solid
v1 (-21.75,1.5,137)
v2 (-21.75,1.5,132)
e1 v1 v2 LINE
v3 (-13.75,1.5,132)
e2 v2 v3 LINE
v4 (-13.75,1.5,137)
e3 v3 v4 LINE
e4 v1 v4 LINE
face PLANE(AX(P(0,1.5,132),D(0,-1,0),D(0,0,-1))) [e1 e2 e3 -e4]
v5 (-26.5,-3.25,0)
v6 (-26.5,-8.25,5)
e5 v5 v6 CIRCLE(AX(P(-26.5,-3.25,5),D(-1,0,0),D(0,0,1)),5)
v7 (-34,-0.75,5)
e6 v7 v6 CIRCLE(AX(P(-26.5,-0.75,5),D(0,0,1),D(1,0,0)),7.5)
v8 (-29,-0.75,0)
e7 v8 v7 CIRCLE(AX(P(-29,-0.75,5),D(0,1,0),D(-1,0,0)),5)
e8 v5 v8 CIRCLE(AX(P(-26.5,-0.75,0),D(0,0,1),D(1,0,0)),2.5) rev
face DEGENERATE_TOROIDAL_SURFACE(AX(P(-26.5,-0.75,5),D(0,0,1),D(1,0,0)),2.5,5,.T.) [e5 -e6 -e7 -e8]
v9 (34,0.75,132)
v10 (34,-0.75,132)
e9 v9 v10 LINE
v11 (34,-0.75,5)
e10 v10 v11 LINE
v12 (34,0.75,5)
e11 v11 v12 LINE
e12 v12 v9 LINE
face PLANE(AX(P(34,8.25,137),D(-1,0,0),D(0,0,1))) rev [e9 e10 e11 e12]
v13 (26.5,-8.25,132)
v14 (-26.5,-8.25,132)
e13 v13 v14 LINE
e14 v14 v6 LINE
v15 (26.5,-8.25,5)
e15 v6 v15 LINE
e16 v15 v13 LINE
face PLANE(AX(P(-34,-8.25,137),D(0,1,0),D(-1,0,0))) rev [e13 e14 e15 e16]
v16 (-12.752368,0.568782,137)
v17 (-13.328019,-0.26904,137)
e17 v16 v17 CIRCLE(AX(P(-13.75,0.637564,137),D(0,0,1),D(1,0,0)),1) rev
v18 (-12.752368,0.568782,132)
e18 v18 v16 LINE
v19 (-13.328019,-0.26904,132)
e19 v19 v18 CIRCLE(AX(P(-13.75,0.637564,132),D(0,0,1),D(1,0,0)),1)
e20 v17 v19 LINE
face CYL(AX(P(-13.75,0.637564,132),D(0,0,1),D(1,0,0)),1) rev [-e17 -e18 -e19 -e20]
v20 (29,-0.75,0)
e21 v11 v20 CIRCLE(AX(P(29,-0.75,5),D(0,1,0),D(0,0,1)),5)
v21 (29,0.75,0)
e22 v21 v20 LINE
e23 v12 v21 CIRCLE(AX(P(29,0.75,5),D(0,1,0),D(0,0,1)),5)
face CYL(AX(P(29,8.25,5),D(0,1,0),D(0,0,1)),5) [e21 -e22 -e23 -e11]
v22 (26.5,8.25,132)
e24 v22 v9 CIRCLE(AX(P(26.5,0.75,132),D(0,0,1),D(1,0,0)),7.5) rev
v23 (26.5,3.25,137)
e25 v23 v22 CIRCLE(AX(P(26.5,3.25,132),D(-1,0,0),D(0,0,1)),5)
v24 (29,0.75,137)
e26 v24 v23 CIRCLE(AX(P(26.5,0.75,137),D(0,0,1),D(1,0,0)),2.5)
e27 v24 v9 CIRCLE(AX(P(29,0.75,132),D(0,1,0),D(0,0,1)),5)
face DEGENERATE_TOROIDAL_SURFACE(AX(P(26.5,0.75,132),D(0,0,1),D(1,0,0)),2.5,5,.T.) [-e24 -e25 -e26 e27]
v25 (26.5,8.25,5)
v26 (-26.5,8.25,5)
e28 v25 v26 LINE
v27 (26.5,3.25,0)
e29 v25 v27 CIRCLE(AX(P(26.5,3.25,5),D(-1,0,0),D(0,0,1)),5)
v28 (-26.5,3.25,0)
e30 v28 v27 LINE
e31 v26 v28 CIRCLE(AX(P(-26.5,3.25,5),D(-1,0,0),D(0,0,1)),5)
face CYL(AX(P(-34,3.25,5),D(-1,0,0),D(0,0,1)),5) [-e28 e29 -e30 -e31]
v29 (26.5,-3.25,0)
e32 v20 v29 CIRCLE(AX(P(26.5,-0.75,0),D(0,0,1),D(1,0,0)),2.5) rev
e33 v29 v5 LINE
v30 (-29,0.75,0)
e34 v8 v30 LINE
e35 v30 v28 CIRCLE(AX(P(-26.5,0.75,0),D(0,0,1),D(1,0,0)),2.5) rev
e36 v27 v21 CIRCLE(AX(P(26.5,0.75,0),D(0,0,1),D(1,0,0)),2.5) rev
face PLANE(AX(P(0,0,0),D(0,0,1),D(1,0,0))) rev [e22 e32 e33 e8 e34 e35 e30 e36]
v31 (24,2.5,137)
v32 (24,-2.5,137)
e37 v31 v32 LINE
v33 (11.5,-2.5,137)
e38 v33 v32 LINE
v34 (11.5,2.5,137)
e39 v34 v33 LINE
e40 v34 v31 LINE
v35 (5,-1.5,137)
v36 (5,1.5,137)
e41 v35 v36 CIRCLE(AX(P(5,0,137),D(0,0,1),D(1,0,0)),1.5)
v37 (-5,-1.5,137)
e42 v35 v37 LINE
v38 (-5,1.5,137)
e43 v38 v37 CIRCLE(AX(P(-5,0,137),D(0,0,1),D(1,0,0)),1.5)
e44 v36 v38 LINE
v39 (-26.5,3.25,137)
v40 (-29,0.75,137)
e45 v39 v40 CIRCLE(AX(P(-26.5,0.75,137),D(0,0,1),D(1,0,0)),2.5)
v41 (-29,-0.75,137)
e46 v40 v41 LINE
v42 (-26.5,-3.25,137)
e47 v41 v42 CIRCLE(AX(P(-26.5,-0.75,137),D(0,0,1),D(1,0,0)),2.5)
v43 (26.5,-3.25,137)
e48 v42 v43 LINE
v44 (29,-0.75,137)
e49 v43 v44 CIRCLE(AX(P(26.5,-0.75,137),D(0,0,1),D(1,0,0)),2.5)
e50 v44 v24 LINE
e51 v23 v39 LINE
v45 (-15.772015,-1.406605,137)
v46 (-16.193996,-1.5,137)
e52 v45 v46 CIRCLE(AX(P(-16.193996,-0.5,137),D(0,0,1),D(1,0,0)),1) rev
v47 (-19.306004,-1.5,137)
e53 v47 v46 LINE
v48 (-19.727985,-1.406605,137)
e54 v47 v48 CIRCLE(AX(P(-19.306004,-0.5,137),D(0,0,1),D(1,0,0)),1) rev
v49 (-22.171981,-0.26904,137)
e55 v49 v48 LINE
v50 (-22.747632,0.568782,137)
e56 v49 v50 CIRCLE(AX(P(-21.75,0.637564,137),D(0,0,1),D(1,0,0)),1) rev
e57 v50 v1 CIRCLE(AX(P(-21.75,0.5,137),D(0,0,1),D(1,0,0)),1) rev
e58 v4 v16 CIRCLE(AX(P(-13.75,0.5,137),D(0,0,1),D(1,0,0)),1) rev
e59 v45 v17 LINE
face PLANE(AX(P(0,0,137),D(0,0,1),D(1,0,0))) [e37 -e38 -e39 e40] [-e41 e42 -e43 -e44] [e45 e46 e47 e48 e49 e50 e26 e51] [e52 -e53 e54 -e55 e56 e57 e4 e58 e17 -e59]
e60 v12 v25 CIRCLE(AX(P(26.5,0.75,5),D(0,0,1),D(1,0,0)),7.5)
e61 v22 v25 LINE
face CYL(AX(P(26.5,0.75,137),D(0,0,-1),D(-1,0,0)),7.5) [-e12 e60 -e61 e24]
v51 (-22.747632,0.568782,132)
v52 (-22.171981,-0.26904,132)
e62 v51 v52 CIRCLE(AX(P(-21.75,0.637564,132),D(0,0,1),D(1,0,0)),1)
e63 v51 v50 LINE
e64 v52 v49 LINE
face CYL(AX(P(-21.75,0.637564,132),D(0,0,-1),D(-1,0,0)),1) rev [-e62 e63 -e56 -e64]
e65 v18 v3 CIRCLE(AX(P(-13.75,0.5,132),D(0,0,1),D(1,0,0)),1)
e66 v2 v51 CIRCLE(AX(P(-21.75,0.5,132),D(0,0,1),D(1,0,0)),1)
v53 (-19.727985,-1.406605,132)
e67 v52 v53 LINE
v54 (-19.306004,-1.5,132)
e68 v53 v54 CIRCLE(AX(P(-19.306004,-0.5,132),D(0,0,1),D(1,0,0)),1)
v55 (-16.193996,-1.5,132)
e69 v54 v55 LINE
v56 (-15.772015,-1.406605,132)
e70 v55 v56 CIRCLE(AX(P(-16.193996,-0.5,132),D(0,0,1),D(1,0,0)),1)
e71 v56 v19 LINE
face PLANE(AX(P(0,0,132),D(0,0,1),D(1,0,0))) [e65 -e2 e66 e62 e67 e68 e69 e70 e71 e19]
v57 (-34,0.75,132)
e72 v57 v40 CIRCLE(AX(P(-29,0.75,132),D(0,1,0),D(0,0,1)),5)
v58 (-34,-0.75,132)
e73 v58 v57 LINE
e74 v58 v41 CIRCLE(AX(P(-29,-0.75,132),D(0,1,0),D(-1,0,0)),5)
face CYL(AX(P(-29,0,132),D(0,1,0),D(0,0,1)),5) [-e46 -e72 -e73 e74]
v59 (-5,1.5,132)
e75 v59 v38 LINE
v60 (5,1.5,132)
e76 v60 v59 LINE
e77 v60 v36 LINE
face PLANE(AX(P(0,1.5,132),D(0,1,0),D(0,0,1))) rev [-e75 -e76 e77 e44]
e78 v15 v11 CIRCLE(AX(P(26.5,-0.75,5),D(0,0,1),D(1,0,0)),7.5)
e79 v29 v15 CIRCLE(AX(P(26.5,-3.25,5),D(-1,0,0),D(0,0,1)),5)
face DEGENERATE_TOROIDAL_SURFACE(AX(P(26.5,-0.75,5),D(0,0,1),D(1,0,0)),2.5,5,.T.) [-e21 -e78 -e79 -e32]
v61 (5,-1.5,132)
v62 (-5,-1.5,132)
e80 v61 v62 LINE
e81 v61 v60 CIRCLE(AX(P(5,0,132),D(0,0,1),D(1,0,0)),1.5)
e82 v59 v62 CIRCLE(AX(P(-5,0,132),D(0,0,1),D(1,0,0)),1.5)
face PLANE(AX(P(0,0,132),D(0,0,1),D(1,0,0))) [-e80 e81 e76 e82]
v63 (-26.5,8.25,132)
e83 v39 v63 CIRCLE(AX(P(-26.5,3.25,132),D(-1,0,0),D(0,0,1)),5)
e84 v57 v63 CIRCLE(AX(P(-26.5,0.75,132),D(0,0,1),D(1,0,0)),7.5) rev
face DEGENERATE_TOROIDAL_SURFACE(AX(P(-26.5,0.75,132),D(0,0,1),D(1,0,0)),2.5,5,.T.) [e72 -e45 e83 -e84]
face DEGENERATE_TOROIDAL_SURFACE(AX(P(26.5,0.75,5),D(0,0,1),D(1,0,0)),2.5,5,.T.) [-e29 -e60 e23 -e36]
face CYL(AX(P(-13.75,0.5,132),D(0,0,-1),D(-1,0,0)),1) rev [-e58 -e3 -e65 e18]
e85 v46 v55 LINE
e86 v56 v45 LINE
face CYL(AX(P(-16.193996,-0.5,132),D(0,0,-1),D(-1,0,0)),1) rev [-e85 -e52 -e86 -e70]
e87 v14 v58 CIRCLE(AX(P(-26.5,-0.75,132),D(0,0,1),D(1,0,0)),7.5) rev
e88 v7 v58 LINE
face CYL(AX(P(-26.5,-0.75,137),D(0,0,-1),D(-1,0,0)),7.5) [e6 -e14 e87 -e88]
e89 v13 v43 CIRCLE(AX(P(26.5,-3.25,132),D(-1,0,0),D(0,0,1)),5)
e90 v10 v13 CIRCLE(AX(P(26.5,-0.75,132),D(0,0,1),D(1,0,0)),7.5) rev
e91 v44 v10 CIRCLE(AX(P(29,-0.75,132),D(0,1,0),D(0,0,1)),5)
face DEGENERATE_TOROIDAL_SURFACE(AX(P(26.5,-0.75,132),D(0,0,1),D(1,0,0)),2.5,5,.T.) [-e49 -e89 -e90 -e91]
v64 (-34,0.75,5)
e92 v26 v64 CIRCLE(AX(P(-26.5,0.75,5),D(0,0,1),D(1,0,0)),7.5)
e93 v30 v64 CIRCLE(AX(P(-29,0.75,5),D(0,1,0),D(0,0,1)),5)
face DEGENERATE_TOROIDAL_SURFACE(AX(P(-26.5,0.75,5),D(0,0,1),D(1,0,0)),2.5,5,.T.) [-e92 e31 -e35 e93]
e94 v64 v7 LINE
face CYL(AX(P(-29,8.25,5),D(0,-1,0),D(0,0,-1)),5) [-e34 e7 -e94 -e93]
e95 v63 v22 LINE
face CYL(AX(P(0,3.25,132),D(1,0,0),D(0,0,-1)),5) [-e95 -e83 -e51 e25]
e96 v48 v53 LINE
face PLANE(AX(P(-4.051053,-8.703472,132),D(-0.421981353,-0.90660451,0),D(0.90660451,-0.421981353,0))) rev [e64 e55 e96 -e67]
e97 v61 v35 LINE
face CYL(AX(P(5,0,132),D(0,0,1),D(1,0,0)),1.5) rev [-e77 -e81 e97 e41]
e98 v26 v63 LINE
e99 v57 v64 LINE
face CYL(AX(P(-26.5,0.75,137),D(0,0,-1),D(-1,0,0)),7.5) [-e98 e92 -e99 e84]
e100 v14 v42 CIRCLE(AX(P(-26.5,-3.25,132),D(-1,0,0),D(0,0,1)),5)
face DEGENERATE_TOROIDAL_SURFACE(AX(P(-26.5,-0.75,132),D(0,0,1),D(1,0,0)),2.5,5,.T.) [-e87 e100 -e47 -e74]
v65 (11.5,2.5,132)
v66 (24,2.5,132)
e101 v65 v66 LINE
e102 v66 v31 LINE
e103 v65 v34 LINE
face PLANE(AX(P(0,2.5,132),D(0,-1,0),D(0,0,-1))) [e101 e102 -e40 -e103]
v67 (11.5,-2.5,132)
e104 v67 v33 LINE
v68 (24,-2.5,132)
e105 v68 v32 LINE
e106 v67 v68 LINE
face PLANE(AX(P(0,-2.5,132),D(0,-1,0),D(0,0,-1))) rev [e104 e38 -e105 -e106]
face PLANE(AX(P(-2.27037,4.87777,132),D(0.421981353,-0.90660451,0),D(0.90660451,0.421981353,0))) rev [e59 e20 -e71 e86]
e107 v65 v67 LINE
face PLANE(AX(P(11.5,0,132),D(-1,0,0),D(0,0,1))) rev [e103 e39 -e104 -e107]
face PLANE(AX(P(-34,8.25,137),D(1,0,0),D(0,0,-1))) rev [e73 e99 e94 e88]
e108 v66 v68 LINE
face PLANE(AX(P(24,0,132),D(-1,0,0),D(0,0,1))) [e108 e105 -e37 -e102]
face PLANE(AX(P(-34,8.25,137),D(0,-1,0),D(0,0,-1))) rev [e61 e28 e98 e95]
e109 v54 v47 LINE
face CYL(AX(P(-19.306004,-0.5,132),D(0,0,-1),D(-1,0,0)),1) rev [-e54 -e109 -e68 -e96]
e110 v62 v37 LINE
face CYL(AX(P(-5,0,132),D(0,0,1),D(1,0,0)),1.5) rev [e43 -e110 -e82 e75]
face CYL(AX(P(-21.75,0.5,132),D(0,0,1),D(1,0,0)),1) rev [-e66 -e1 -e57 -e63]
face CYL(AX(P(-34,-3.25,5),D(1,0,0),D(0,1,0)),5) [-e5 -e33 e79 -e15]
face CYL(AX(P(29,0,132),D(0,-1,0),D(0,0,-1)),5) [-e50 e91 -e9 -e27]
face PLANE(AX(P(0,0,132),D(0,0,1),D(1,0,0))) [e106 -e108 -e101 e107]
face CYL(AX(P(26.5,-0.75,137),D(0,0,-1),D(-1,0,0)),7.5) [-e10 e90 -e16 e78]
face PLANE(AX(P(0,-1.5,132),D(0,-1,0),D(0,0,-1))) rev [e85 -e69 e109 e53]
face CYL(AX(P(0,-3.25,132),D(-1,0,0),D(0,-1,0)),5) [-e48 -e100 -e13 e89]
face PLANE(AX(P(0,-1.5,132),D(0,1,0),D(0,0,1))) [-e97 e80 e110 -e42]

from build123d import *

# Parameters (mm, degrees)
ESQUISSE1_W             = 68
ESQUISSE1_H             = 16.5
BOSS_EXTRU_1_DEPTH      = 137
CONG_1_R                = 7.5
CONG_2_R                = 5
ESQUISSE2_W             = 12.5
ESQUISSE2_H             = 5
ENL_V_MAT_EXTRU_1_DEPTH = 5
CONG_3_R                = 1


with BuildPart() as part:
    # Esquisse1 → Boss.-Extru.1 (new body)
    with BuildSketch(Plane.XY):
        Rectangle(ESQUISSE1_W, ESQUISSE1_H)
    extrude(amount=BOSS_EXTRU_1_DEPTH)

    # Congé1
    cong_1_edges = [part.edges().sort_by_distance(p)[0] for p in [
        (-34, 8.25, 68.5),
        (34, 8.25, 68.5),
        (34, -8.25, 68.5),
        (-34, -8.25, 68.5),
    ]]
    fillet(cong_1_edges, radius=CONG_1_R)

    # Congé2
    cong_2_edges = [part.edges().sort_by_distance(p)[0] for p in [
        (34, 0, 0),
        (34, 0, 137),
        (-34, 0, 0),
        (0, 8.25, 0),
        (0, -8.25, 0),
        (-31.803300859, 6.053300859, 0),
        (-31.803300859, -6.053300859, 0),
        (31.803300859, 6.053300859, 0),
        (31.803300859, -6.053300859, 0),
        (0, -8.25, 137),
        (-34, 0, 137),
        (0, 8.25, 137),
        (-31.803300859, 6.053300859, 137),
        (-31.803300859, -6.053300859, 137),
        (31.803300859, 6.053300859, 137),
        (31.803300859, -6.053300859, 137),
    ]]
    fillet(cong_2_edges, radius=CONG_2_R)

    # Esquisse2 → Enlèv. mat.-Extru.1 (cut)
    with BuildSketch(Plane.XY.offset(137)):
        Polygon((-12.75, 1.5), (-22.75, 1.5), (-22.75, 0), (-19.52732972, -1.5), (-15.97267028, -1.5), (-12.75, 0), align=None)
        with BuildLine():
            Line((5, 1.5), (-5, 1.5))
            ThreePointArc((-5, 1.5), (-6.5, 0), (-5, -1.5))
            Line((-5, -1.5), (5, -1.5))
            ThreePointArc((5, -1.5), (6.5, 0), (5, 1.5))
        make_face()
        with Locations((17.75, 0)):
            Rectangle(ESQUISSE2_W, ESQUISSE2_H)
    extrude(amount=-ENL_V_MAT_EXTRU_1_DEPTH, mode=Mode.SUBTRACT)

    # Congé3
    # the kernel refuses this fillet: 1 mm, written as the material it adds along each edge
    with BuildSketch(Plane(origin=(-15.97267028, -1.5, 137), x_dir=(0.9066045100812768, 0.4219813530243817, 0), z_dir=(0, 0, -1)), Plane(origin=(-19.52732972, -1.5, 137), x_dir=(1, 0, 0), z_dir=(0, 0, -1))) as cong_3_piece_1:
        with BuildLine():
            CenterArc((CONG_3_R * 0.221326106591, -CONG_3_R), CONG_3_R, 90, 24.959741925)
            Line((-CONG_3_R * 0.200655246434, -CONG_3_R * 0.0933954899187), (0, 0))
            Line((0, 0), (CONG_3_R * 0.221326106591, 0))
        make_face()
    extrude(amount=5.553315266)
    with BuildSketch(Plane(origin=(-22.75, 0, 137), x_dir=(0.9066045100812758, -0.42198135302438383, 0), z_dir=(0, 0, -1))) as cong_3_piece_2:
        with BuildLine():
            CenterArc((CONG_3_R * 0.637564274773, -CONG_3_R), CONG_3_R, 90, 65.040258075)
            Line((-CONG_3_R * 0.269040235309, -CONG_3_R * 0.578018646976), (0, 0))
            Line((0, 0), (CONG_3_R * 0.637564274773, 0))
        make_face()
    extrude(amount=6.593910687)
    with BuildSketch(Plane(origin=(-22.75, 1.5, 137), x_dir=(0, -1, 0), z_dir=(0, 0, -1)), Plane(origin=(-12.75, 1.5, 137), x_dir=(-1, 0, 0), z_dir=(0, 0, -1))) as cong_3_piece_3:
        with BuildLine():
            CenterArc((CONG_3_R, -CONG_3_R), CONG_3_R, 90, 90)
            Line((0, -CONG_3_R), (0, 0))
            Line((0, 0), (CONG_3_R, 0))
        make_face()
    extrude(amount=7.5)
    with BuildSketch(Plane(origin=(-12.75, 0, 137), x_dir=(-0.906604510081276, -0.4219813530243839, 0), z_dir=(0, 0, -1))) as cong_3_piece_4:
        with BuildLine():
            CenterArc((CONG_3_R * 0.637564274773, CONG_3_R), CONG_3_R, 204.959741925, 65.040258075)
            Line((-CONG_3_R * 0.269040235309, CONG_3_R * 0.578018646976), (0, 0))
            Line((0, 0), (CONG_3_R * 0.637564274773, 0))
        make_face()
    extrude(amount=6.593910687)


solid = part.part
